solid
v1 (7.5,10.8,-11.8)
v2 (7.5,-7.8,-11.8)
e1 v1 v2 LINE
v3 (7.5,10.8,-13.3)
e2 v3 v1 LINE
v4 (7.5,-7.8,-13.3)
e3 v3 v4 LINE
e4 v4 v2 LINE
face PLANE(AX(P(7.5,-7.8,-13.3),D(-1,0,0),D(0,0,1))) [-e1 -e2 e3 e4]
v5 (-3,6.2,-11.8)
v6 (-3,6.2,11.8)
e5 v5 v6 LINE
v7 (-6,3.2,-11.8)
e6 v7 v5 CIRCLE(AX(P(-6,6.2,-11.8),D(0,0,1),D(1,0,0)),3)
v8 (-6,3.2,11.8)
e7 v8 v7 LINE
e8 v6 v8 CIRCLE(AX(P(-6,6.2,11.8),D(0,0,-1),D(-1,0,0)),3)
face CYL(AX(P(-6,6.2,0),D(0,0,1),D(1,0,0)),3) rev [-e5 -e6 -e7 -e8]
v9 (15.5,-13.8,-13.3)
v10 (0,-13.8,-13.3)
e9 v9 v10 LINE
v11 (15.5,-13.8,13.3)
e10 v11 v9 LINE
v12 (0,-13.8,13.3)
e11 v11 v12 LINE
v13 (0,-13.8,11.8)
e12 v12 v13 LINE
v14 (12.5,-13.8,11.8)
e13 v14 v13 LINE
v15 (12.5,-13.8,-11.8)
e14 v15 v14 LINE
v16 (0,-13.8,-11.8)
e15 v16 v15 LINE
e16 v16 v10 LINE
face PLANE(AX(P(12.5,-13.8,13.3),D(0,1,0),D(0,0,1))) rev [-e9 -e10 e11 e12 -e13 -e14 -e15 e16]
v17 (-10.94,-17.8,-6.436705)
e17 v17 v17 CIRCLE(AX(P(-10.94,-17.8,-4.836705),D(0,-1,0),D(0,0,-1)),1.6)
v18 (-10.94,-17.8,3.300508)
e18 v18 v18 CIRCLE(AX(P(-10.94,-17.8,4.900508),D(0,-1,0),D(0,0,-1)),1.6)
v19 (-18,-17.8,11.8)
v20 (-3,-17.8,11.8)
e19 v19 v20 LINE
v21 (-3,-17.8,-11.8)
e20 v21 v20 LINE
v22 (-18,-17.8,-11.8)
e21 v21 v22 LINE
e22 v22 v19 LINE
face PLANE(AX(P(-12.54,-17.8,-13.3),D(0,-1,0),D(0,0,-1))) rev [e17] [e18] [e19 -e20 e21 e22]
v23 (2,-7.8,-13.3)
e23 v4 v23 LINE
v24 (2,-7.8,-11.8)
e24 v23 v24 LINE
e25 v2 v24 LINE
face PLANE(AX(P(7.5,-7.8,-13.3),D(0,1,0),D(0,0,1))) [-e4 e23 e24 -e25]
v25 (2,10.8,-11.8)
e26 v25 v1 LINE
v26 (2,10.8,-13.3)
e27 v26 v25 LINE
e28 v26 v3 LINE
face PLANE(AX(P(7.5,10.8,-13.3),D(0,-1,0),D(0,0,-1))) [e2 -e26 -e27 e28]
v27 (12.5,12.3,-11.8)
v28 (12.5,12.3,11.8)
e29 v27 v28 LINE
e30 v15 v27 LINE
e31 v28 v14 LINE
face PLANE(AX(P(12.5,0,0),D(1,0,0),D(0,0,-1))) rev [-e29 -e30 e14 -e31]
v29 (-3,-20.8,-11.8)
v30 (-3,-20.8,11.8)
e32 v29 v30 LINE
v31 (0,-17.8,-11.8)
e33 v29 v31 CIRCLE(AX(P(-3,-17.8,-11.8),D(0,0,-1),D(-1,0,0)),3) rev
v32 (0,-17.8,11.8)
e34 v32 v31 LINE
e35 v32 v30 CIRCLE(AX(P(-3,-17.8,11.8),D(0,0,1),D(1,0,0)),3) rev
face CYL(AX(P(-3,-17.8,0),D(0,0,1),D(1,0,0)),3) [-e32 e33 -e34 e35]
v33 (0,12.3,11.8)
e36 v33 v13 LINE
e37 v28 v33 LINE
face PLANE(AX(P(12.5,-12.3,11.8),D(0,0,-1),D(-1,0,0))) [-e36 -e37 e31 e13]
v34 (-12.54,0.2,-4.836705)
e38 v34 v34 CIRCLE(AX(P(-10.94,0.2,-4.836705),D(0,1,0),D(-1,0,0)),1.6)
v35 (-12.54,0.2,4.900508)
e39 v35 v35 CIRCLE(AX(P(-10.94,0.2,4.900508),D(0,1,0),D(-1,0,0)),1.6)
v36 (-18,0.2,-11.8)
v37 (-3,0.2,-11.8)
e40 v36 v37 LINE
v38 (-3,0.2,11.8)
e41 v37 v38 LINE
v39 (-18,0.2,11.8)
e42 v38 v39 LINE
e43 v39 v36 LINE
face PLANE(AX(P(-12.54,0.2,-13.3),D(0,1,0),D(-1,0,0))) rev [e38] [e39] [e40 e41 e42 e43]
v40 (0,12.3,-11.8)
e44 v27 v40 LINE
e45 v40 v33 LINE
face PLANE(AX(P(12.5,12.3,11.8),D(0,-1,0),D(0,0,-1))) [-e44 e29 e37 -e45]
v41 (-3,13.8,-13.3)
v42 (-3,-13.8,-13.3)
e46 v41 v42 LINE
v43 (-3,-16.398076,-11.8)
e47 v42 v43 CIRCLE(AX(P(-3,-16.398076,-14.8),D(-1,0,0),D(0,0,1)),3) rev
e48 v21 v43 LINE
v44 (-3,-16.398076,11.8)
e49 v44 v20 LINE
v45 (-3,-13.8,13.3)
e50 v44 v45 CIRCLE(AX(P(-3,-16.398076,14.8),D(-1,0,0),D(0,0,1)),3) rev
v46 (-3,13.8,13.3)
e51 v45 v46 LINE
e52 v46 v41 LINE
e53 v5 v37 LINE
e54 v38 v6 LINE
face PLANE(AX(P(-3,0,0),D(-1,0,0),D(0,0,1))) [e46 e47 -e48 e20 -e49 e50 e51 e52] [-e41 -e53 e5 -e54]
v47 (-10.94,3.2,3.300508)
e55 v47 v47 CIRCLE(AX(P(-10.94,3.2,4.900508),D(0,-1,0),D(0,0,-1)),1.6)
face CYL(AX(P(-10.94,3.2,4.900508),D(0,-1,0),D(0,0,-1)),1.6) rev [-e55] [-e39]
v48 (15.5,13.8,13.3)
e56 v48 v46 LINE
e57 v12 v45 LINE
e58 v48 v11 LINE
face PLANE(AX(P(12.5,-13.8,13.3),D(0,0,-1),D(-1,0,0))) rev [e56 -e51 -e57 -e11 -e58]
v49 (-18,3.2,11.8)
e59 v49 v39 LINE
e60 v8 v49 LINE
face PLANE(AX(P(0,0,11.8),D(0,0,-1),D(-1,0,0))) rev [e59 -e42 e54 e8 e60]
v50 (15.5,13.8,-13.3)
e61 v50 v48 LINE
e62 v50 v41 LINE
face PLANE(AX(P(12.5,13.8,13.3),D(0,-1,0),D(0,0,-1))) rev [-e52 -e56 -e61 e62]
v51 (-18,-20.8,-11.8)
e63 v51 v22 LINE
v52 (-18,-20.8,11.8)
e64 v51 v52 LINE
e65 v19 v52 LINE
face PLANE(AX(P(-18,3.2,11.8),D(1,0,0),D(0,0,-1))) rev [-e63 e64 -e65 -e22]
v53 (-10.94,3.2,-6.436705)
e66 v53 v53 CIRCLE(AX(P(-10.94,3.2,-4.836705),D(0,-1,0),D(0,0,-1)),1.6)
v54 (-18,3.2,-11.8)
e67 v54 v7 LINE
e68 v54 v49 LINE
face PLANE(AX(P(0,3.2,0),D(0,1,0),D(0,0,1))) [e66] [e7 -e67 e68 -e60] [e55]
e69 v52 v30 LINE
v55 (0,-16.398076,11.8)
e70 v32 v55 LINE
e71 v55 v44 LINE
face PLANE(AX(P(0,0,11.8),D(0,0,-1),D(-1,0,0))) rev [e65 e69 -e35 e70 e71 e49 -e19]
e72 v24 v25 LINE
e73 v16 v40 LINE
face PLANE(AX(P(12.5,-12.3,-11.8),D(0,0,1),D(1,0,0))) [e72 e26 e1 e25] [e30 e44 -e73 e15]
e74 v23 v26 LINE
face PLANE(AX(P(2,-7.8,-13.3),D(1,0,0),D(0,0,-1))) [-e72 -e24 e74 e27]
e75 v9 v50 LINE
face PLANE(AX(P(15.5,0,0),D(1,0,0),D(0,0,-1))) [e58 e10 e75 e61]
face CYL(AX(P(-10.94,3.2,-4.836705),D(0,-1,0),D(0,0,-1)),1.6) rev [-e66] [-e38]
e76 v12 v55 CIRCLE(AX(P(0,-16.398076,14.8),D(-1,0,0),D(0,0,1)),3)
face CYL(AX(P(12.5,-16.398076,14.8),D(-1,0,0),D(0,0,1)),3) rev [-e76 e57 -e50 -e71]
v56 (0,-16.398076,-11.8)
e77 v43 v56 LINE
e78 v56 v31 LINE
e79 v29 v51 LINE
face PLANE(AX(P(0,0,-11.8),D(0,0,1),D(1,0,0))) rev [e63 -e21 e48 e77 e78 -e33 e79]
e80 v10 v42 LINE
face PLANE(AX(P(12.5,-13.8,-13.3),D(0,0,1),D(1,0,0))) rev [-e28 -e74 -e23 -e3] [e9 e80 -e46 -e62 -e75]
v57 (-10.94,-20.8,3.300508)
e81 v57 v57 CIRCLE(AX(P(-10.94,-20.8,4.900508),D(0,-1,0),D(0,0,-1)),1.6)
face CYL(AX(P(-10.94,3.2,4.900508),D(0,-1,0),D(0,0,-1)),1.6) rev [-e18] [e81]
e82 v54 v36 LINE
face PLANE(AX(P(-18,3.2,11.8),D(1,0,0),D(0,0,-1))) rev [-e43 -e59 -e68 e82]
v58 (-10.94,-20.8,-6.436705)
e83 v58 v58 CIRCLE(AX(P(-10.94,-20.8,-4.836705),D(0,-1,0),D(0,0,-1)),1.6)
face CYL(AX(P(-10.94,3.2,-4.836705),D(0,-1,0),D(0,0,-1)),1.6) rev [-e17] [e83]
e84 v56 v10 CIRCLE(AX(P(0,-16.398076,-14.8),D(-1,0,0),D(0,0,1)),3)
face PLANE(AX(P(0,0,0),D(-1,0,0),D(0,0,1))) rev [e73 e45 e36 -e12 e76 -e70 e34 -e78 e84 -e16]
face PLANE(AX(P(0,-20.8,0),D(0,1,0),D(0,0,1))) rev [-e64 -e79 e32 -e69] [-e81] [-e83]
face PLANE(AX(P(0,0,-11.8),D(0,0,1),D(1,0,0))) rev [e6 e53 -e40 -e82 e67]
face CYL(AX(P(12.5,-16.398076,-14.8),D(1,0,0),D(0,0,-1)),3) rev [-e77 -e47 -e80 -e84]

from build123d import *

# Parameters (mm, degrees)
SKETCH1_W                = 26.6
SKETCH1_H                = 27.6
SKETCH1_W_2              = 23.6
SKETCH1_H_2              = 24.6
BOSS_EXTRUDE1_DEPTH      = 12.5
SKETCH2_W                = 26.6
SKETCH2_H                = 27.6
BOSS_EXTRUDE2_DEPTH      = 3
SKETCH4_W                = 26.6
SKETCH4_H                = 27.6
BOSS_EXTRUDE3_DEPTH      = 3
SKETCH6_W                = 12.5
SKETCH6_H                = 20.6
CUT_EXTRUDE1_DEPTH       = 3
BOSS_EXTRUDE4_DEPTH      = 7
BOSS_EXTRUDE4_DEPTH_BACK = 17
SKETCH7_W                = 12.54
SKETCH7_H                = 14.392021094
SKETCH8_R                = 1.6
CUT_EXTRUDE2_DEPTH       = 41.17835238
SKETCH10_W               = 9.54
SKETCH10_H               = 18
CUT_EXTRUDE3_DEPTH       = 34.198989028
SKETCH14_W               = 12.5
SKETCH14_H               = 23.6
CUT_EXTRUDE5_DEPTH       = 3
SKETCH24_W               = 3
SKETCH24_H               = 5.880857343
BOSS_EXTRUDE7_DEPTH      = 7
SKETCH25_W               = 3
SKETCH25_H               = 6.327121563
BOSS_EXTRUDE8_DEPTH      = 7
SKETCH27_W               = 26.6
SKETCH27_H               = 3
BOSS_EXTRUDE9_DEPTH      = 20
SKETCH32_W               = 26.6
SKETCH32_H               = 3
BOSS_EXTRUDE10_DEPTH     = 20
FILLET1_R                = 3
SKETCH35_W               = 20
SKETCH35_H               = 24
CUT_EXTRUDE9_DEPTH       = 1.5
SKETCH36_W               = 3
SKETCH36_H               = 7
CUT_EXTRUDE10_DEPTH      = 1.5
SKETCH37_W               = 20
SKETCH37_H               = 24
CUT_EXTRUDE11_DEPTH      = 1.5
SKETCH38_W               = 3
SKETCH38_H               = 7
CUT_EXTRUDE12_DEPTH      = 1.5
FILLET3_R                = 3
FILLET4_R                = 3
FILLET5_R                = 3
SKETCH39_W               = 5
SKETCH39_H               = 23.6
CUT_EXTRUDE13_DEPTH      = 24
SKETCH41_R               = 1.6
CUT_EXTRUDE14_DEPTH      = 24
SKETCH42_W               = 5.5
SKETCH42_H               = 18.6
CUT_EXTRUDE15_DEPTH      = 38.237749663


with BuildPart() as part:
    # Sketch1 → Boss-Extrude1 (new body)
    with BuildSketch(Plane(origin=(0, 0, 0), x_dir=(0, 0, -1), z_dir=(1, 0, 0))):
        Rectangle(SKETCH1_W, SKETCH1_H)
        Rectangle(SKETCH1_W_2, SKETCH1_H_2, mode=Mode.SUBTRACT)
    extrude(amount=BOSS_EXTRUDE1_DEPTH)

    # Sketch2 → Boss-Extrude2 (add)
    with BuildSketch(Plane.ZY):
        Rectangle(SKETCH2_W, SKETCH2_H)
    extrude(amount=BOSS_EXTRUDE2_DEPTH)

    # Sketch4 → Boss-Extrude3 (add)
    with BuildSketch(Plane(origin=(12.5, 0, 0), x_dir=(0, 0, -1), z_dir=(1, 0, 0))):
        Rectangle(SKETCH4_W, SKETCH4_H)
    extrude(amount=BOSS_EXTRUDE3_DEPTH)

    # Sketch6 → Cut-Extrude1 (cut)
    with BuildSketch(Plane(origin=(0, -13.8, 0), x_dir=(-1, 0, 0), z_dir=(0, -1, 0))):
        with Locations((-6.25, 0)):
            Rectangle(SKETCH6_W, SKETCH6_H)
    extrude(amount=-CUT_EXTRUDE1_DEPTH, mode=Mode.SUBTRACT)

    # Sketch7 → Boss-Extrude4 (add, two sides: drawn at the far end of the back side and taken through both)
    with BuildSketch(Plane(origin=(0, -13.8, 0), x_dir=(-1, 0, 0), z_dir=(0, -1, 0)).offset(-BOSS_EXTRUDE4_DEPTH_BACK)):
        with Locations((6.27, -0.22313211)):
            Rectangle(SKETCH7_W, SKETCH7_H)
    extrude(amount=BOSS_EXTRUDE4_DEPTH + BOSS_EXTRUDE4_DEPTH_BACK)

    # Sketch8 → Cut-Extrude2 (cut, through all)
    with BuildSketch(Plane(origin=(0, -20.8, 0), x_dir=(-1, 0, 0), z_dir=(0, -1, 0))):
        with Locations(Location((9.94, -4.900507757, 0), (0, 0, 90))):
            Circle(SKETCH8_R)
        with Locations(Location((9.94, 4.836704631, 0), (0, 0, 90))):
            Circle(SKETCH8_R)
    extrude(amount=-CUT_EXTRUDE2_DEPTH, mode=Mode.SUBTRACT)

    # Sketch10 → Cut-Extrude3 (cut, through all)
    with BuildSketch(Plane.XY.offset(7.419142657)):
        with Locations((-7.77, -8.8)):
            Rectangle(SKETCH10_W, SKETCH10_H)
    extrude(amount=-CUT_EXTRUDE3_DEPTH, mode=Mode.SUBTRACT)

    # Sketch14 → Cut-Extrude5 (cut)
    with BuildSketch(Plane(origin=(0, -13.8, 0), x_dir=(-1, 0, 0), z_dir=(0, -1, 0))):
        with Locations((-6.25, 0)):
            Rectangle(SKETCH14_W, SKETCH14_H)
    extrude(amount=-CUT_EXTRUDE5_DEPTH, mode=Mode.SUBTRACT)

    # Sketch24 → Boss-Extrude7 (add)
    with BuildSketch(Plane(origin=(0, -13.8, 0), x_dir=(-1, 0, 0), z_dir=(0, -1, 0))):
        with Locations((1.5, -10.359571328)):
            Rectangle(SKETCH24_W, SKETCH24_H)
    extrude(amount=BOSS_EXTRUDE7_DEPTH)

    # Sketch25 → Boss-Extrude8 (add)
    with BuildSketch(Plane(origin=(0, -13.8, 0), x_dir=(-1, 0, 0), z_dir=(0, -1, 0))):
        with Locations((1.5, 10.136439219)):
            Rectangle(SKETCH25_W, SKETCH25_H)
    extrude(amount=BOSS_EXTRUDE8_DEPTH)

    # Sketch27 → Boss-Extrude9 (add)
    with BuildSketch(Plane.ZY.offset(3)):
        with Locations((0, -19.3)):
            Rectangle(SKETCH27_W, SKETCH27_H)
    extrude(amount=BOSS_EXTRUDE9_DEPTH)

    # Sketch32 → Boss-Extrude10 (add)
    with BuildSketch(Plane.ZY.offset(3)):
        with Locations((0, 1.7)):
            Rectangle(SKETCH32_W, SKETCH32_H)
    extrude(amount=BOSS_EXTRUDE10_DEPTH)

    # Fillet1
    fillet1_edges = [part.edges().sort_by_distance(p)[0] for p in [
        (0, -20.8, 0),
    ]]
    fillet(fillet1_edges, radius=FILLET1_R)

    # Sketch35 → Cut-Extrude9 (cut)
    with BuildSketch(Plane.XY.offset(13.3)):
        with Locations((-13, -8.8)):
            Rectangle(SKETCH35_W, SKETCH35_H)
    extrude(amount=-CUT_EXTRUDE9_DEPTH, mode=Mode.SUBTRACT)

    # Sketch36 → Cut-Extrude10 (cut)
    with BuildSketch(Plane.XY.offset(13.3)):
        with Locations((-1.5, -17.3)):
            Rectangle(SKETCH36_W, SKETCH36_H)
    extrude(amount=-CUT_EXTRUDE10_DEPTH, mode=Mode.SUBTRACT)

    # Sketch37 → Cut-Extrude11 (cut)
    with BuildSketch(Plane(origin=(0, 0, -13.3), x_dir=(-1, 0, 0), z_dir=(0, 0, -1))):
        with Locations((13, -8.8)):
            Rectangle(SKETCH37_W, SKETCH37_H)
    extrude(amount=-CUT_EXTRUDE11_DEPTH, mode=Mode.SUBTRACT)

    # Sketch38 → Cut-Extrude12 (cut)
    with BuildSketch(Plane(origin=(0, 0, -13.3), x_dir=(-1, 0, 0), z_dir=(0, 0, -1))):
        with Locations((1.5, -17.3)):
            Rectangle(SKETCH38_W, SKETCH38_H)
    extrude(amount=-CUT_EXTRUDE12_DEPTH, mode=Mode.SUBTRACT)

    # Fillet3
    # the kernel refuses this fillet: 3 mm, written as the material it adds along each edge
    with BuildSketch(Plane(origin=(-3, -13.8, 11.8), x_dir=(0, 0, 1), z_dir=(1, 0, 0))) as fillet3_piece_1:
        with BuildLine():
            CenterArc((3, 2.598076211), FILLET3_R, 180, 60)
            Line((0, 2.598076211), (0, 0))
            Line((0, 0), (1.5, 0))
        make_face()
    extrude(amount=3)

    # Fillet4
    # the kernel refuses this fillet: 3 mm, written as the material it adds along each edge
    with BuildSketch(Plane(origin=(0, -13.8, -11.8), x_dir=(0, 0, -1), z_dir=(-1, 0, 0))) as fillet4_piece_1:
        with BuildLine():
            CenterArc((3, 2.598076211), FILLET4_R, 180, 60)
            Line((0, 2.598076211), (0, 0))
            Line((0, 0), (1.5, 0))
        make_face()
    extrude(amount=3)

    # Fillet5
    fillet5_edges = [part.edges().sort_by_distance(p)[0] for p in [
        (-3, 3.2, 0),
    ]]
    fillet(fillet5_edges, radius=FILLET5_R)

    # Sketch39 → Cut-Extrude13 (cut)
    with BuildSketch(Plane(origin=(0, -20.8, 0), x_dir=(-1, 0, 0), z_dir=(0, -1, 0))):
        with Locations((20.5, 0)):
            Rectangle(SKETCH39_W, SKETCH39_H)
    extrude(amount=-CUT_EXTRUDE13_DEPTH, mode=Mode.SUBTRACT)

    # Sketch41 → Cut-Extrude14 (cut)
    with BuildSketch(Plane(origin=(0, -20.8, 0), x_dir=(-1, 0, 0), z_dir=(0, -1, 0))):
        with Locations(Location((10.94, -4.900507757, 0), (0, 0, 90))):
            Circle(SKETCH41_R)
        with Locations(Location((10.94, 4.836704631, 0), (0, 0, 90))):
            Circle(SKETCH41_R)
    extrude(amount=-CUT_EXTRUDE14_DEPTH, mode=Mode.SUBTRACT)

    # Sketch42 → Cut-Extrude15 (cut, through all)
    with BuildSketch(Plane(origin=(0, 0, 11.8), x_dir=(-1, 0, 0), z_dir=(0, 0, -1))):
        with Locations((-4.75, 1.5)):
            Rectangle(SKETCH42_W, SKETCH42_H)
    extrude(amount=CUT_EXTRUDE15_DEPTH, mode=Mode.SUBTRACT)


solid = part.part
